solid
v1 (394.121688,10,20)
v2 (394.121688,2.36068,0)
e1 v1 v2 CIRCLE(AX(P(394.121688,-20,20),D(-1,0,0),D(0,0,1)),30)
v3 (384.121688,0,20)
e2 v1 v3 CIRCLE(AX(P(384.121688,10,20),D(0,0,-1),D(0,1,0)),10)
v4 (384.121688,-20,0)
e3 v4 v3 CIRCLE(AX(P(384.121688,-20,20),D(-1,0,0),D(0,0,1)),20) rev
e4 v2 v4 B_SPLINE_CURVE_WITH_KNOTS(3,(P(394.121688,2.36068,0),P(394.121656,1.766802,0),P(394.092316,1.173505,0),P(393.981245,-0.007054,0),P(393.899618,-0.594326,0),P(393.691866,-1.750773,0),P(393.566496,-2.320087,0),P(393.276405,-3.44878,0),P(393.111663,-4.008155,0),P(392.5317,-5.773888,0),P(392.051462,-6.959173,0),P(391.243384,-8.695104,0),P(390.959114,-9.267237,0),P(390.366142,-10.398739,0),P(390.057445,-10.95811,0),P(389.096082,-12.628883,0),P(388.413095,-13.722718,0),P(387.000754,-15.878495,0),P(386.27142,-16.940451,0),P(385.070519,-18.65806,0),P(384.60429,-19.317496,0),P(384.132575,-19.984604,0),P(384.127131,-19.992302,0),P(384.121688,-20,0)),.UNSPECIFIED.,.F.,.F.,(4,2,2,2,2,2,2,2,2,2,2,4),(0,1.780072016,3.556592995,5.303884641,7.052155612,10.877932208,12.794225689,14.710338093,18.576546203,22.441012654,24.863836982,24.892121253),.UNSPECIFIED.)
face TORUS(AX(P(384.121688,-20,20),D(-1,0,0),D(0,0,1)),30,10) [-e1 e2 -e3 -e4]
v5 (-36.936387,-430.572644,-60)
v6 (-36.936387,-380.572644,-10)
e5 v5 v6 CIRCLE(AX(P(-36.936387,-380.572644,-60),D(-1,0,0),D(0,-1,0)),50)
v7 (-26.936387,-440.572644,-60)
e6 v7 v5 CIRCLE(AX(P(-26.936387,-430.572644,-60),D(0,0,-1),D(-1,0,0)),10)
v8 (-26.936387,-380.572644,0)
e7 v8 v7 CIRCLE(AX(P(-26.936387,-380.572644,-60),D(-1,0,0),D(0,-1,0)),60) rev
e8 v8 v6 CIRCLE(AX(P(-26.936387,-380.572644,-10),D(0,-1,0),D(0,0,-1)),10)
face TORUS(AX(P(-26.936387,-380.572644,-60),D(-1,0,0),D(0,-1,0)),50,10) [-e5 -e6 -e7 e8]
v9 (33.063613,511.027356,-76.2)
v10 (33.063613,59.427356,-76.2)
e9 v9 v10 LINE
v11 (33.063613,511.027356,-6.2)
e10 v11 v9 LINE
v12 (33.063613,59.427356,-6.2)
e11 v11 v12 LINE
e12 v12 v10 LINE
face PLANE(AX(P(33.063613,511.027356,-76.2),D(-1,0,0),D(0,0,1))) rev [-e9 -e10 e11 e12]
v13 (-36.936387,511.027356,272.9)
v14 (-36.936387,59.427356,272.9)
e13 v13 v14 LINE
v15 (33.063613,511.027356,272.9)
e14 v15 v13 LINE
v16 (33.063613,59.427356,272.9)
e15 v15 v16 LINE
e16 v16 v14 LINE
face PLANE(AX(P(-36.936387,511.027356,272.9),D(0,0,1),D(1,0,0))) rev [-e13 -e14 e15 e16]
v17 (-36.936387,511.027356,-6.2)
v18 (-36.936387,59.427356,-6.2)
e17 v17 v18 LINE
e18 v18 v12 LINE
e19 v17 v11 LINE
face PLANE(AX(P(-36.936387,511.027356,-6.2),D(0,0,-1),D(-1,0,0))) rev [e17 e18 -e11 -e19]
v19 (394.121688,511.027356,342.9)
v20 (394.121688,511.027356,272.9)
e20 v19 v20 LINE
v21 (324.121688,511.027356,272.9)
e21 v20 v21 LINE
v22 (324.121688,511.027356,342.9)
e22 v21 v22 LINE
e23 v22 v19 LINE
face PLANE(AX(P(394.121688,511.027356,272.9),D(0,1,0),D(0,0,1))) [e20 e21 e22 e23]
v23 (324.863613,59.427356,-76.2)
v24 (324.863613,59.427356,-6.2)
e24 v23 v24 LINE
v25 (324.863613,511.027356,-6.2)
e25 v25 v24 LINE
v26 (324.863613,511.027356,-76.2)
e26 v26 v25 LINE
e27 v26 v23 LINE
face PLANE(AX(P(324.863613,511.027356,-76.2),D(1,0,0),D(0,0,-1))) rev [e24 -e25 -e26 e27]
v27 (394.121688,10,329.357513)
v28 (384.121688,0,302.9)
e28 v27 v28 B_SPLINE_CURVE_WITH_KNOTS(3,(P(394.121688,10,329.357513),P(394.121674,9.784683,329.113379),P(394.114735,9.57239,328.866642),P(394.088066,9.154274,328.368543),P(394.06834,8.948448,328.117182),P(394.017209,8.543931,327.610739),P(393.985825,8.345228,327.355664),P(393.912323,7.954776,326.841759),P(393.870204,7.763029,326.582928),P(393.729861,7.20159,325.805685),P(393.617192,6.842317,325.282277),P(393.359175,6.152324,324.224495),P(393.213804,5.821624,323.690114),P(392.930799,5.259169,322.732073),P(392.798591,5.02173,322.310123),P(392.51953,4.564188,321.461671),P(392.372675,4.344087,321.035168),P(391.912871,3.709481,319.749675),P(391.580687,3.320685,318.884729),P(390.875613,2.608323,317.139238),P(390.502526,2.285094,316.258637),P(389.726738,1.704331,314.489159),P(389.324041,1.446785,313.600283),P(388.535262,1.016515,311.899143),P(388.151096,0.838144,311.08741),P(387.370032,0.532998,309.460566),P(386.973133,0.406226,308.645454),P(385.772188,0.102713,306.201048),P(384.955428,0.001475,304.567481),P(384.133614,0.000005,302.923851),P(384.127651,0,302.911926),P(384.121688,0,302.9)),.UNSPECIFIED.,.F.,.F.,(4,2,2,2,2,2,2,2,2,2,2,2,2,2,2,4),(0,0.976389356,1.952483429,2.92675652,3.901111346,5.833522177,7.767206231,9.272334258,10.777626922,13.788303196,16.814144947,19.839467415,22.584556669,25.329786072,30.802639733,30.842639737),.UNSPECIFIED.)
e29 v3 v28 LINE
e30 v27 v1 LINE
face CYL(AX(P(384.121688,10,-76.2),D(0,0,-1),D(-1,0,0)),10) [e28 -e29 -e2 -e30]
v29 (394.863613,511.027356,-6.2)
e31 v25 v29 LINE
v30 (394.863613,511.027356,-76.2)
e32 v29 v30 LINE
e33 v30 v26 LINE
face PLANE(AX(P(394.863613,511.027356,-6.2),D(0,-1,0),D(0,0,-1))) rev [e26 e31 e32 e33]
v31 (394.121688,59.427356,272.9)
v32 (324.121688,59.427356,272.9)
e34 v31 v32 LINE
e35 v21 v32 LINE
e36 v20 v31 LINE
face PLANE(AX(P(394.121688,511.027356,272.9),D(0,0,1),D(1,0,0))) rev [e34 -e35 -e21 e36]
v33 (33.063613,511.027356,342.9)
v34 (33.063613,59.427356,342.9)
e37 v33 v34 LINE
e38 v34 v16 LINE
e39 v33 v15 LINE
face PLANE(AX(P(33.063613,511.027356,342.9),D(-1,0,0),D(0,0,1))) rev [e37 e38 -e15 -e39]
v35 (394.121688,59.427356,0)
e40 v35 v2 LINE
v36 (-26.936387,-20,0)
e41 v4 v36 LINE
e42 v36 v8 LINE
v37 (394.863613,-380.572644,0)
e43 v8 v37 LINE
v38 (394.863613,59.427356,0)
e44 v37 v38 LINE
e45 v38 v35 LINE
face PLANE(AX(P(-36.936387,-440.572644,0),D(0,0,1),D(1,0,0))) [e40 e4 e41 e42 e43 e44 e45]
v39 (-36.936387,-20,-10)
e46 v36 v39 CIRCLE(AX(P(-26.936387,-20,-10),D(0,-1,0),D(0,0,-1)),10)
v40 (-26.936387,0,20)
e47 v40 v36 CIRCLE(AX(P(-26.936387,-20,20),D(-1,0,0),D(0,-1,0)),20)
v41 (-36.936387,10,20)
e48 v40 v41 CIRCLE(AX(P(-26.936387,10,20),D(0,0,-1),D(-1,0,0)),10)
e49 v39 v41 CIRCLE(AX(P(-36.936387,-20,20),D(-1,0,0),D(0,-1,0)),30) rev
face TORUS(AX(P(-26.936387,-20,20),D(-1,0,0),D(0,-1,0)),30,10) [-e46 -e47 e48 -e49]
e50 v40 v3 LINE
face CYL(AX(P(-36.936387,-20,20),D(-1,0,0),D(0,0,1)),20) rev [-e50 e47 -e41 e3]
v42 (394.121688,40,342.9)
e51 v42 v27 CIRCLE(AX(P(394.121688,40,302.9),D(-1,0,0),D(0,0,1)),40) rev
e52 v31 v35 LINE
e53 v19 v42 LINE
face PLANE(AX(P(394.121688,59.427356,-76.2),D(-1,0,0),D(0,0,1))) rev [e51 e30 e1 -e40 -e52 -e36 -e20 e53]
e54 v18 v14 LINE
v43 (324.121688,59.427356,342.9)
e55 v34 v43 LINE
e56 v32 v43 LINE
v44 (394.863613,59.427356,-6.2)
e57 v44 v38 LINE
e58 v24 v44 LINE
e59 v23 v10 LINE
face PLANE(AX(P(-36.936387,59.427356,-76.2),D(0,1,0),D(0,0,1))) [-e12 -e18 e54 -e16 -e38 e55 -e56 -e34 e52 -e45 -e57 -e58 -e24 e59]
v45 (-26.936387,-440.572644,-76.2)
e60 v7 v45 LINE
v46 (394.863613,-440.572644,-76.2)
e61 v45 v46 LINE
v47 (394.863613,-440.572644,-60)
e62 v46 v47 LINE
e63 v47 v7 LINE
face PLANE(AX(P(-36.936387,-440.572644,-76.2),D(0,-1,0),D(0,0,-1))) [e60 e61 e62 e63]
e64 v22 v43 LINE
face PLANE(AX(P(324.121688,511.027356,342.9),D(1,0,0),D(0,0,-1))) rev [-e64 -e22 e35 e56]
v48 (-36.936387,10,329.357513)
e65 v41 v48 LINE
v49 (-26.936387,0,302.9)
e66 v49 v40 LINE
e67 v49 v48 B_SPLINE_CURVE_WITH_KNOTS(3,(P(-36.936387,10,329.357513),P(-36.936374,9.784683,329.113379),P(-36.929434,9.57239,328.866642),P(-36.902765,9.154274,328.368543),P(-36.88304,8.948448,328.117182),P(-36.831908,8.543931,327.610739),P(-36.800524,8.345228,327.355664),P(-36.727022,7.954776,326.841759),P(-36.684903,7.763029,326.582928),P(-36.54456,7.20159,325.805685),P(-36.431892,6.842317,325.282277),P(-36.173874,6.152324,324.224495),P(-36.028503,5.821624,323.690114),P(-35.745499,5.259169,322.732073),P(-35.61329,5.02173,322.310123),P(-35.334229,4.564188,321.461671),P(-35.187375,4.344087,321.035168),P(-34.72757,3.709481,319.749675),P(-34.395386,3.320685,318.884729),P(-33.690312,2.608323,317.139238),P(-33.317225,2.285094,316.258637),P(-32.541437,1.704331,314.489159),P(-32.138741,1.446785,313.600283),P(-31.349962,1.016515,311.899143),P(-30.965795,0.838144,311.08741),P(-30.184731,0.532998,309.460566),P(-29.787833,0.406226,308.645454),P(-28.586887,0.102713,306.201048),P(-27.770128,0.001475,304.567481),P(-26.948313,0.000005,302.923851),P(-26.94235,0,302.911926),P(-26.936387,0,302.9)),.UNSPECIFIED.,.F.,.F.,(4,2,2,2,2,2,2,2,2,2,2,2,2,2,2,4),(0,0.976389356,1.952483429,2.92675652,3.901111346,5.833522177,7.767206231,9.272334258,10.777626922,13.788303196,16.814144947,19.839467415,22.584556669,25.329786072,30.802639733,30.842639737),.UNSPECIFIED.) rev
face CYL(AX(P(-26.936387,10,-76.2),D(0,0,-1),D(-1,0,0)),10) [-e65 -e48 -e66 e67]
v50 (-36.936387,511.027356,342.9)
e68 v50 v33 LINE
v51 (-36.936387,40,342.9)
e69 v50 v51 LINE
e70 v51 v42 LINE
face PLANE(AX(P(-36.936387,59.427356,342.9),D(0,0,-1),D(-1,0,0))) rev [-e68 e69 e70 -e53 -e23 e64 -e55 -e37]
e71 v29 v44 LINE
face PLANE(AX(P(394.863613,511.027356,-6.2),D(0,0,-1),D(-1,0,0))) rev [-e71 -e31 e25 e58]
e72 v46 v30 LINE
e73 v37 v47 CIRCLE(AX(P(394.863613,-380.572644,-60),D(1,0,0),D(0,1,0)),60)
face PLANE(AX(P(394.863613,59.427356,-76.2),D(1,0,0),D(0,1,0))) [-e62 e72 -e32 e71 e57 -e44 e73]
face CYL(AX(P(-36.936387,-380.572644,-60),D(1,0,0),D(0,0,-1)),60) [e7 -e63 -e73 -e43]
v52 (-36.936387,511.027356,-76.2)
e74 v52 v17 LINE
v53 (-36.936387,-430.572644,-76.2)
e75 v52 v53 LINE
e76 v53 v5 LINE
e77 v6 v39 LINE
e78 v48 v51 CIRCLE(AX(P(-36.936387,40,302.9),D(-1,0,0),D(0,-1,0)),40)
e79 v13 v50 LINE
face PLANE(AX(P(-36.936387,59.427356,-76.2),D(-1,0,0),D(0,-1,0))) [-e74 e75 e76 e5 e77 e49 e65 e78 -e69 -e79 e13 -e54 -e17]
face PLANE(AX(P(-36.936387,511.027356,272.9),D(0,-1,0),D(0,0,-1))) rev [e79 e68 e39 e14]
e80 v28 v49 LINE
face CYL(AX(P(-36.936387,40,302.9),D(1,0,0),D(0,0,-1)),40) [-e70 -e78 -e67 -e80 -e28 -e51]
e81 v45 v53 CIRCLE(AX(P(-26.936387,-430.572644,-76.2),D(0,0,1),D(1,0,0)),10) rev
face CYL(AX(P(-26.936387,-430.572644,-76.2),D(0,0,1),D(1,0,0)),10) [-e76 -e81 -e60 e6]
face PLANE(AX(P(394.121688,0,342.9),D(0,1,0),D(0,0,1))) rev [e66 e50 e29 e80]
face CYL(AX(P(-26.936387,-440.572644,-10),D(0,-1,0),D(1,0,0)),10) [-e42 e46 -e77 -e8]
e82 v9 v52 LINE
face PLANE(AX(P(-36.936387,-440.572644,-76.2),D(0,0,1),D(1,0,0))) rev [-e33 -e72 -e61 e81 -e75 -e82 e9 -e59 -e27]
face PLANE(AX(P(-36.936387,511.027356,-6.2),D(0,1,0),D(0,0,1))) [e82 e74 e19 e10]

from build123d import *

# Parameters (mm, degrees)
BASE_EXTRUDE_DEPTH  = 76.2
BOSS_EXTRUDE2_DEPTH = 59.427356
SKETCH4_W           = 70
SKETCH4_H           = 70
BOSS_EXTRUDE3_DEPTH = 451.60000000000053
FILLET1_START       = -36.936387435
FILLET1_DEPTH       = 431.8
FILLET1_2_OUTLINE_W = 451.6
FILLET1_2_OUTLINE_H = 70
FILLET1_2_DEPTH     = 70
FILLET1_START_2     = 324.863612565
FILLET1_3_OUTLINE_W = 451.6
FILLET1_3_OUTLINE_H = 70
FILLET1_3_DEPTH     = 70
FILLET2_R           = 19.999999999999996
FILLET4_R           = 9.999999999999996
FILLET7_R           = 9.999999999999996
FILLET11_R          = 40


with BuildPart() as part:
    # Sketch1 → Base-Extrude (new body)
    with BuildSketch(Plane.XY):
        Polygon((-36.93638743455497, 59.4273560209424), (394.863612565445, 59.4273560209424), (394.86361256544507, -440.5726439790576), (-36.93638743455492, -440.5726439790576), align=None)
    extrude(amount=-BASE_EXTRUDE_DEPTH)

    # Sketch3 → Boss-Extrude2 (add)
    with BuildSketch(Plane(origin=(0, 0, 0), x_dir=(1, 0, 0), z_dir=(0, 1, 0))):
        Polygon((-36.93638743455497, 76.2), (394.1216881668196, 76.2), (394.12168816681964, -342.9), (-36.93638743455493, -342.9), align=None)
    extrude(amount=BOSS_EXTRUDE2_DEPTH)

    # Sketch4 → Boss-Extrude3 (add)
    with BuildSketch(Plane(origin=(0, 59.4273560209424, 0), x_dir=(-1, 0, 0), z_dir=(0, 1, 0))):
        Polygon((36.93638743455493, 342.9), (-33.06361256544507, 342.9), (-33.06361256544506, 272.9), (36.93638743455494, 272.9), align=None)
        with Locations((-359.12168816681964, 307.9)):
            Rectangle(SKETCH4_W, SKETCH4_H)
    extrude(amount=BOSS_EXTRUDE3_DEPTH)

    # Fillet1: read off the stored shape, not the designer's step
    # Fillet1 outline → Fillet1 (cut)
    with BuildSketch(Plane.YZ.offset(FILLET1_START)):
        with BuildLine():
            Line((-440.572643979, 0), (-440.572643979, -60))
            ThreePointArc((-440.572643979, -60), (-422.99905085, -17.573593129), (-380.572643979, 0))
            Line((-380.572643979, 0), (-440.572643979, 0))
        make_face()
    extrude(amount=FILLET1_DEPTH, mode=Mode.SUBTRACT)

    # Fillet1 2 outline → Fillet1 2 (add)
    with BuildSketch(Plane.YZ.offset(FILLET1_START)):
        with Locations((285.227356021, -41.2)):
            Rectangle(FILLET1_2_OUTLINE_W, FILLET1_2_OUTLINE_H)
    extrude(amount=FILLET1_2_DEPTH)

    # Fillet1 3 outline → Fillet1 3 (add)
    with BuildSketch(Plane.YZ.offset(FILLET1_START_2)):
        with Locations((285.227356021, -41.2)):
            Rectangle(FILLET1_3_OUTLINE_W, FILLET1_3_OUTLINE_H)
    extrude(amount=FILLET1_3_DEPTH)

    # Fillet2
    fillet2_edges = [part.edges().sort_by_distance(p)[0] for p in [
        (178.59265036613232, 0, 0),
    ]]
    fillet(fillet2_edges, radius=FILLET2_R)

    # Fillet4
    fillet4_edges = [part.edges().sort_by_distance(p)[0] for p in [
        (394.12168816681964, 0, 181.45),
        (394.1216881668196, -5.857864376269045, 5.857864376269044),
    ]]
    fillet(fillet4_edges, radius=FILLET4_R)

    # Fillet7
    fillet7_edges = [part.edges().sort_by_distance(p)[0] for p in [
        (-36.93638743455492, -440.5726439790576, -68.1),
        (-36.936387435, -422.99905085, -17.573593129000002),
        (-36.936387434554945, -200.2863219895, 0),
        (-36.936387434554945, 0, 181.45),
        (-36.936387434554945, -5.857864376269045, 5.857864376269044),
    ]]
    fillet(fillet7_edges, radius=FILLET7_R)

    # Fillet11
    # the kernel refuses this fillet: 40 mm, written as the material it takes off along each edge
    with BuildSketch(Plane(origin=(484.12168816681964, 0, 342.9), x_dir=(0, 0, -1), z_dir=(-1, 0, 0))) as fillet11_piece_1:
        with BuildLine():
            CenterArc((FILLET11_R, -FILLET11_R), FILLET11_R, 90, 90)
            Line((0, -FILLET11_R), (0, 0))
            Line((0, 0), (FILLET11_R, 0))
        make_face()
    extrude(amount=611.0580756013748, mode=Mode.SUBTRACT)


solid = part.part
